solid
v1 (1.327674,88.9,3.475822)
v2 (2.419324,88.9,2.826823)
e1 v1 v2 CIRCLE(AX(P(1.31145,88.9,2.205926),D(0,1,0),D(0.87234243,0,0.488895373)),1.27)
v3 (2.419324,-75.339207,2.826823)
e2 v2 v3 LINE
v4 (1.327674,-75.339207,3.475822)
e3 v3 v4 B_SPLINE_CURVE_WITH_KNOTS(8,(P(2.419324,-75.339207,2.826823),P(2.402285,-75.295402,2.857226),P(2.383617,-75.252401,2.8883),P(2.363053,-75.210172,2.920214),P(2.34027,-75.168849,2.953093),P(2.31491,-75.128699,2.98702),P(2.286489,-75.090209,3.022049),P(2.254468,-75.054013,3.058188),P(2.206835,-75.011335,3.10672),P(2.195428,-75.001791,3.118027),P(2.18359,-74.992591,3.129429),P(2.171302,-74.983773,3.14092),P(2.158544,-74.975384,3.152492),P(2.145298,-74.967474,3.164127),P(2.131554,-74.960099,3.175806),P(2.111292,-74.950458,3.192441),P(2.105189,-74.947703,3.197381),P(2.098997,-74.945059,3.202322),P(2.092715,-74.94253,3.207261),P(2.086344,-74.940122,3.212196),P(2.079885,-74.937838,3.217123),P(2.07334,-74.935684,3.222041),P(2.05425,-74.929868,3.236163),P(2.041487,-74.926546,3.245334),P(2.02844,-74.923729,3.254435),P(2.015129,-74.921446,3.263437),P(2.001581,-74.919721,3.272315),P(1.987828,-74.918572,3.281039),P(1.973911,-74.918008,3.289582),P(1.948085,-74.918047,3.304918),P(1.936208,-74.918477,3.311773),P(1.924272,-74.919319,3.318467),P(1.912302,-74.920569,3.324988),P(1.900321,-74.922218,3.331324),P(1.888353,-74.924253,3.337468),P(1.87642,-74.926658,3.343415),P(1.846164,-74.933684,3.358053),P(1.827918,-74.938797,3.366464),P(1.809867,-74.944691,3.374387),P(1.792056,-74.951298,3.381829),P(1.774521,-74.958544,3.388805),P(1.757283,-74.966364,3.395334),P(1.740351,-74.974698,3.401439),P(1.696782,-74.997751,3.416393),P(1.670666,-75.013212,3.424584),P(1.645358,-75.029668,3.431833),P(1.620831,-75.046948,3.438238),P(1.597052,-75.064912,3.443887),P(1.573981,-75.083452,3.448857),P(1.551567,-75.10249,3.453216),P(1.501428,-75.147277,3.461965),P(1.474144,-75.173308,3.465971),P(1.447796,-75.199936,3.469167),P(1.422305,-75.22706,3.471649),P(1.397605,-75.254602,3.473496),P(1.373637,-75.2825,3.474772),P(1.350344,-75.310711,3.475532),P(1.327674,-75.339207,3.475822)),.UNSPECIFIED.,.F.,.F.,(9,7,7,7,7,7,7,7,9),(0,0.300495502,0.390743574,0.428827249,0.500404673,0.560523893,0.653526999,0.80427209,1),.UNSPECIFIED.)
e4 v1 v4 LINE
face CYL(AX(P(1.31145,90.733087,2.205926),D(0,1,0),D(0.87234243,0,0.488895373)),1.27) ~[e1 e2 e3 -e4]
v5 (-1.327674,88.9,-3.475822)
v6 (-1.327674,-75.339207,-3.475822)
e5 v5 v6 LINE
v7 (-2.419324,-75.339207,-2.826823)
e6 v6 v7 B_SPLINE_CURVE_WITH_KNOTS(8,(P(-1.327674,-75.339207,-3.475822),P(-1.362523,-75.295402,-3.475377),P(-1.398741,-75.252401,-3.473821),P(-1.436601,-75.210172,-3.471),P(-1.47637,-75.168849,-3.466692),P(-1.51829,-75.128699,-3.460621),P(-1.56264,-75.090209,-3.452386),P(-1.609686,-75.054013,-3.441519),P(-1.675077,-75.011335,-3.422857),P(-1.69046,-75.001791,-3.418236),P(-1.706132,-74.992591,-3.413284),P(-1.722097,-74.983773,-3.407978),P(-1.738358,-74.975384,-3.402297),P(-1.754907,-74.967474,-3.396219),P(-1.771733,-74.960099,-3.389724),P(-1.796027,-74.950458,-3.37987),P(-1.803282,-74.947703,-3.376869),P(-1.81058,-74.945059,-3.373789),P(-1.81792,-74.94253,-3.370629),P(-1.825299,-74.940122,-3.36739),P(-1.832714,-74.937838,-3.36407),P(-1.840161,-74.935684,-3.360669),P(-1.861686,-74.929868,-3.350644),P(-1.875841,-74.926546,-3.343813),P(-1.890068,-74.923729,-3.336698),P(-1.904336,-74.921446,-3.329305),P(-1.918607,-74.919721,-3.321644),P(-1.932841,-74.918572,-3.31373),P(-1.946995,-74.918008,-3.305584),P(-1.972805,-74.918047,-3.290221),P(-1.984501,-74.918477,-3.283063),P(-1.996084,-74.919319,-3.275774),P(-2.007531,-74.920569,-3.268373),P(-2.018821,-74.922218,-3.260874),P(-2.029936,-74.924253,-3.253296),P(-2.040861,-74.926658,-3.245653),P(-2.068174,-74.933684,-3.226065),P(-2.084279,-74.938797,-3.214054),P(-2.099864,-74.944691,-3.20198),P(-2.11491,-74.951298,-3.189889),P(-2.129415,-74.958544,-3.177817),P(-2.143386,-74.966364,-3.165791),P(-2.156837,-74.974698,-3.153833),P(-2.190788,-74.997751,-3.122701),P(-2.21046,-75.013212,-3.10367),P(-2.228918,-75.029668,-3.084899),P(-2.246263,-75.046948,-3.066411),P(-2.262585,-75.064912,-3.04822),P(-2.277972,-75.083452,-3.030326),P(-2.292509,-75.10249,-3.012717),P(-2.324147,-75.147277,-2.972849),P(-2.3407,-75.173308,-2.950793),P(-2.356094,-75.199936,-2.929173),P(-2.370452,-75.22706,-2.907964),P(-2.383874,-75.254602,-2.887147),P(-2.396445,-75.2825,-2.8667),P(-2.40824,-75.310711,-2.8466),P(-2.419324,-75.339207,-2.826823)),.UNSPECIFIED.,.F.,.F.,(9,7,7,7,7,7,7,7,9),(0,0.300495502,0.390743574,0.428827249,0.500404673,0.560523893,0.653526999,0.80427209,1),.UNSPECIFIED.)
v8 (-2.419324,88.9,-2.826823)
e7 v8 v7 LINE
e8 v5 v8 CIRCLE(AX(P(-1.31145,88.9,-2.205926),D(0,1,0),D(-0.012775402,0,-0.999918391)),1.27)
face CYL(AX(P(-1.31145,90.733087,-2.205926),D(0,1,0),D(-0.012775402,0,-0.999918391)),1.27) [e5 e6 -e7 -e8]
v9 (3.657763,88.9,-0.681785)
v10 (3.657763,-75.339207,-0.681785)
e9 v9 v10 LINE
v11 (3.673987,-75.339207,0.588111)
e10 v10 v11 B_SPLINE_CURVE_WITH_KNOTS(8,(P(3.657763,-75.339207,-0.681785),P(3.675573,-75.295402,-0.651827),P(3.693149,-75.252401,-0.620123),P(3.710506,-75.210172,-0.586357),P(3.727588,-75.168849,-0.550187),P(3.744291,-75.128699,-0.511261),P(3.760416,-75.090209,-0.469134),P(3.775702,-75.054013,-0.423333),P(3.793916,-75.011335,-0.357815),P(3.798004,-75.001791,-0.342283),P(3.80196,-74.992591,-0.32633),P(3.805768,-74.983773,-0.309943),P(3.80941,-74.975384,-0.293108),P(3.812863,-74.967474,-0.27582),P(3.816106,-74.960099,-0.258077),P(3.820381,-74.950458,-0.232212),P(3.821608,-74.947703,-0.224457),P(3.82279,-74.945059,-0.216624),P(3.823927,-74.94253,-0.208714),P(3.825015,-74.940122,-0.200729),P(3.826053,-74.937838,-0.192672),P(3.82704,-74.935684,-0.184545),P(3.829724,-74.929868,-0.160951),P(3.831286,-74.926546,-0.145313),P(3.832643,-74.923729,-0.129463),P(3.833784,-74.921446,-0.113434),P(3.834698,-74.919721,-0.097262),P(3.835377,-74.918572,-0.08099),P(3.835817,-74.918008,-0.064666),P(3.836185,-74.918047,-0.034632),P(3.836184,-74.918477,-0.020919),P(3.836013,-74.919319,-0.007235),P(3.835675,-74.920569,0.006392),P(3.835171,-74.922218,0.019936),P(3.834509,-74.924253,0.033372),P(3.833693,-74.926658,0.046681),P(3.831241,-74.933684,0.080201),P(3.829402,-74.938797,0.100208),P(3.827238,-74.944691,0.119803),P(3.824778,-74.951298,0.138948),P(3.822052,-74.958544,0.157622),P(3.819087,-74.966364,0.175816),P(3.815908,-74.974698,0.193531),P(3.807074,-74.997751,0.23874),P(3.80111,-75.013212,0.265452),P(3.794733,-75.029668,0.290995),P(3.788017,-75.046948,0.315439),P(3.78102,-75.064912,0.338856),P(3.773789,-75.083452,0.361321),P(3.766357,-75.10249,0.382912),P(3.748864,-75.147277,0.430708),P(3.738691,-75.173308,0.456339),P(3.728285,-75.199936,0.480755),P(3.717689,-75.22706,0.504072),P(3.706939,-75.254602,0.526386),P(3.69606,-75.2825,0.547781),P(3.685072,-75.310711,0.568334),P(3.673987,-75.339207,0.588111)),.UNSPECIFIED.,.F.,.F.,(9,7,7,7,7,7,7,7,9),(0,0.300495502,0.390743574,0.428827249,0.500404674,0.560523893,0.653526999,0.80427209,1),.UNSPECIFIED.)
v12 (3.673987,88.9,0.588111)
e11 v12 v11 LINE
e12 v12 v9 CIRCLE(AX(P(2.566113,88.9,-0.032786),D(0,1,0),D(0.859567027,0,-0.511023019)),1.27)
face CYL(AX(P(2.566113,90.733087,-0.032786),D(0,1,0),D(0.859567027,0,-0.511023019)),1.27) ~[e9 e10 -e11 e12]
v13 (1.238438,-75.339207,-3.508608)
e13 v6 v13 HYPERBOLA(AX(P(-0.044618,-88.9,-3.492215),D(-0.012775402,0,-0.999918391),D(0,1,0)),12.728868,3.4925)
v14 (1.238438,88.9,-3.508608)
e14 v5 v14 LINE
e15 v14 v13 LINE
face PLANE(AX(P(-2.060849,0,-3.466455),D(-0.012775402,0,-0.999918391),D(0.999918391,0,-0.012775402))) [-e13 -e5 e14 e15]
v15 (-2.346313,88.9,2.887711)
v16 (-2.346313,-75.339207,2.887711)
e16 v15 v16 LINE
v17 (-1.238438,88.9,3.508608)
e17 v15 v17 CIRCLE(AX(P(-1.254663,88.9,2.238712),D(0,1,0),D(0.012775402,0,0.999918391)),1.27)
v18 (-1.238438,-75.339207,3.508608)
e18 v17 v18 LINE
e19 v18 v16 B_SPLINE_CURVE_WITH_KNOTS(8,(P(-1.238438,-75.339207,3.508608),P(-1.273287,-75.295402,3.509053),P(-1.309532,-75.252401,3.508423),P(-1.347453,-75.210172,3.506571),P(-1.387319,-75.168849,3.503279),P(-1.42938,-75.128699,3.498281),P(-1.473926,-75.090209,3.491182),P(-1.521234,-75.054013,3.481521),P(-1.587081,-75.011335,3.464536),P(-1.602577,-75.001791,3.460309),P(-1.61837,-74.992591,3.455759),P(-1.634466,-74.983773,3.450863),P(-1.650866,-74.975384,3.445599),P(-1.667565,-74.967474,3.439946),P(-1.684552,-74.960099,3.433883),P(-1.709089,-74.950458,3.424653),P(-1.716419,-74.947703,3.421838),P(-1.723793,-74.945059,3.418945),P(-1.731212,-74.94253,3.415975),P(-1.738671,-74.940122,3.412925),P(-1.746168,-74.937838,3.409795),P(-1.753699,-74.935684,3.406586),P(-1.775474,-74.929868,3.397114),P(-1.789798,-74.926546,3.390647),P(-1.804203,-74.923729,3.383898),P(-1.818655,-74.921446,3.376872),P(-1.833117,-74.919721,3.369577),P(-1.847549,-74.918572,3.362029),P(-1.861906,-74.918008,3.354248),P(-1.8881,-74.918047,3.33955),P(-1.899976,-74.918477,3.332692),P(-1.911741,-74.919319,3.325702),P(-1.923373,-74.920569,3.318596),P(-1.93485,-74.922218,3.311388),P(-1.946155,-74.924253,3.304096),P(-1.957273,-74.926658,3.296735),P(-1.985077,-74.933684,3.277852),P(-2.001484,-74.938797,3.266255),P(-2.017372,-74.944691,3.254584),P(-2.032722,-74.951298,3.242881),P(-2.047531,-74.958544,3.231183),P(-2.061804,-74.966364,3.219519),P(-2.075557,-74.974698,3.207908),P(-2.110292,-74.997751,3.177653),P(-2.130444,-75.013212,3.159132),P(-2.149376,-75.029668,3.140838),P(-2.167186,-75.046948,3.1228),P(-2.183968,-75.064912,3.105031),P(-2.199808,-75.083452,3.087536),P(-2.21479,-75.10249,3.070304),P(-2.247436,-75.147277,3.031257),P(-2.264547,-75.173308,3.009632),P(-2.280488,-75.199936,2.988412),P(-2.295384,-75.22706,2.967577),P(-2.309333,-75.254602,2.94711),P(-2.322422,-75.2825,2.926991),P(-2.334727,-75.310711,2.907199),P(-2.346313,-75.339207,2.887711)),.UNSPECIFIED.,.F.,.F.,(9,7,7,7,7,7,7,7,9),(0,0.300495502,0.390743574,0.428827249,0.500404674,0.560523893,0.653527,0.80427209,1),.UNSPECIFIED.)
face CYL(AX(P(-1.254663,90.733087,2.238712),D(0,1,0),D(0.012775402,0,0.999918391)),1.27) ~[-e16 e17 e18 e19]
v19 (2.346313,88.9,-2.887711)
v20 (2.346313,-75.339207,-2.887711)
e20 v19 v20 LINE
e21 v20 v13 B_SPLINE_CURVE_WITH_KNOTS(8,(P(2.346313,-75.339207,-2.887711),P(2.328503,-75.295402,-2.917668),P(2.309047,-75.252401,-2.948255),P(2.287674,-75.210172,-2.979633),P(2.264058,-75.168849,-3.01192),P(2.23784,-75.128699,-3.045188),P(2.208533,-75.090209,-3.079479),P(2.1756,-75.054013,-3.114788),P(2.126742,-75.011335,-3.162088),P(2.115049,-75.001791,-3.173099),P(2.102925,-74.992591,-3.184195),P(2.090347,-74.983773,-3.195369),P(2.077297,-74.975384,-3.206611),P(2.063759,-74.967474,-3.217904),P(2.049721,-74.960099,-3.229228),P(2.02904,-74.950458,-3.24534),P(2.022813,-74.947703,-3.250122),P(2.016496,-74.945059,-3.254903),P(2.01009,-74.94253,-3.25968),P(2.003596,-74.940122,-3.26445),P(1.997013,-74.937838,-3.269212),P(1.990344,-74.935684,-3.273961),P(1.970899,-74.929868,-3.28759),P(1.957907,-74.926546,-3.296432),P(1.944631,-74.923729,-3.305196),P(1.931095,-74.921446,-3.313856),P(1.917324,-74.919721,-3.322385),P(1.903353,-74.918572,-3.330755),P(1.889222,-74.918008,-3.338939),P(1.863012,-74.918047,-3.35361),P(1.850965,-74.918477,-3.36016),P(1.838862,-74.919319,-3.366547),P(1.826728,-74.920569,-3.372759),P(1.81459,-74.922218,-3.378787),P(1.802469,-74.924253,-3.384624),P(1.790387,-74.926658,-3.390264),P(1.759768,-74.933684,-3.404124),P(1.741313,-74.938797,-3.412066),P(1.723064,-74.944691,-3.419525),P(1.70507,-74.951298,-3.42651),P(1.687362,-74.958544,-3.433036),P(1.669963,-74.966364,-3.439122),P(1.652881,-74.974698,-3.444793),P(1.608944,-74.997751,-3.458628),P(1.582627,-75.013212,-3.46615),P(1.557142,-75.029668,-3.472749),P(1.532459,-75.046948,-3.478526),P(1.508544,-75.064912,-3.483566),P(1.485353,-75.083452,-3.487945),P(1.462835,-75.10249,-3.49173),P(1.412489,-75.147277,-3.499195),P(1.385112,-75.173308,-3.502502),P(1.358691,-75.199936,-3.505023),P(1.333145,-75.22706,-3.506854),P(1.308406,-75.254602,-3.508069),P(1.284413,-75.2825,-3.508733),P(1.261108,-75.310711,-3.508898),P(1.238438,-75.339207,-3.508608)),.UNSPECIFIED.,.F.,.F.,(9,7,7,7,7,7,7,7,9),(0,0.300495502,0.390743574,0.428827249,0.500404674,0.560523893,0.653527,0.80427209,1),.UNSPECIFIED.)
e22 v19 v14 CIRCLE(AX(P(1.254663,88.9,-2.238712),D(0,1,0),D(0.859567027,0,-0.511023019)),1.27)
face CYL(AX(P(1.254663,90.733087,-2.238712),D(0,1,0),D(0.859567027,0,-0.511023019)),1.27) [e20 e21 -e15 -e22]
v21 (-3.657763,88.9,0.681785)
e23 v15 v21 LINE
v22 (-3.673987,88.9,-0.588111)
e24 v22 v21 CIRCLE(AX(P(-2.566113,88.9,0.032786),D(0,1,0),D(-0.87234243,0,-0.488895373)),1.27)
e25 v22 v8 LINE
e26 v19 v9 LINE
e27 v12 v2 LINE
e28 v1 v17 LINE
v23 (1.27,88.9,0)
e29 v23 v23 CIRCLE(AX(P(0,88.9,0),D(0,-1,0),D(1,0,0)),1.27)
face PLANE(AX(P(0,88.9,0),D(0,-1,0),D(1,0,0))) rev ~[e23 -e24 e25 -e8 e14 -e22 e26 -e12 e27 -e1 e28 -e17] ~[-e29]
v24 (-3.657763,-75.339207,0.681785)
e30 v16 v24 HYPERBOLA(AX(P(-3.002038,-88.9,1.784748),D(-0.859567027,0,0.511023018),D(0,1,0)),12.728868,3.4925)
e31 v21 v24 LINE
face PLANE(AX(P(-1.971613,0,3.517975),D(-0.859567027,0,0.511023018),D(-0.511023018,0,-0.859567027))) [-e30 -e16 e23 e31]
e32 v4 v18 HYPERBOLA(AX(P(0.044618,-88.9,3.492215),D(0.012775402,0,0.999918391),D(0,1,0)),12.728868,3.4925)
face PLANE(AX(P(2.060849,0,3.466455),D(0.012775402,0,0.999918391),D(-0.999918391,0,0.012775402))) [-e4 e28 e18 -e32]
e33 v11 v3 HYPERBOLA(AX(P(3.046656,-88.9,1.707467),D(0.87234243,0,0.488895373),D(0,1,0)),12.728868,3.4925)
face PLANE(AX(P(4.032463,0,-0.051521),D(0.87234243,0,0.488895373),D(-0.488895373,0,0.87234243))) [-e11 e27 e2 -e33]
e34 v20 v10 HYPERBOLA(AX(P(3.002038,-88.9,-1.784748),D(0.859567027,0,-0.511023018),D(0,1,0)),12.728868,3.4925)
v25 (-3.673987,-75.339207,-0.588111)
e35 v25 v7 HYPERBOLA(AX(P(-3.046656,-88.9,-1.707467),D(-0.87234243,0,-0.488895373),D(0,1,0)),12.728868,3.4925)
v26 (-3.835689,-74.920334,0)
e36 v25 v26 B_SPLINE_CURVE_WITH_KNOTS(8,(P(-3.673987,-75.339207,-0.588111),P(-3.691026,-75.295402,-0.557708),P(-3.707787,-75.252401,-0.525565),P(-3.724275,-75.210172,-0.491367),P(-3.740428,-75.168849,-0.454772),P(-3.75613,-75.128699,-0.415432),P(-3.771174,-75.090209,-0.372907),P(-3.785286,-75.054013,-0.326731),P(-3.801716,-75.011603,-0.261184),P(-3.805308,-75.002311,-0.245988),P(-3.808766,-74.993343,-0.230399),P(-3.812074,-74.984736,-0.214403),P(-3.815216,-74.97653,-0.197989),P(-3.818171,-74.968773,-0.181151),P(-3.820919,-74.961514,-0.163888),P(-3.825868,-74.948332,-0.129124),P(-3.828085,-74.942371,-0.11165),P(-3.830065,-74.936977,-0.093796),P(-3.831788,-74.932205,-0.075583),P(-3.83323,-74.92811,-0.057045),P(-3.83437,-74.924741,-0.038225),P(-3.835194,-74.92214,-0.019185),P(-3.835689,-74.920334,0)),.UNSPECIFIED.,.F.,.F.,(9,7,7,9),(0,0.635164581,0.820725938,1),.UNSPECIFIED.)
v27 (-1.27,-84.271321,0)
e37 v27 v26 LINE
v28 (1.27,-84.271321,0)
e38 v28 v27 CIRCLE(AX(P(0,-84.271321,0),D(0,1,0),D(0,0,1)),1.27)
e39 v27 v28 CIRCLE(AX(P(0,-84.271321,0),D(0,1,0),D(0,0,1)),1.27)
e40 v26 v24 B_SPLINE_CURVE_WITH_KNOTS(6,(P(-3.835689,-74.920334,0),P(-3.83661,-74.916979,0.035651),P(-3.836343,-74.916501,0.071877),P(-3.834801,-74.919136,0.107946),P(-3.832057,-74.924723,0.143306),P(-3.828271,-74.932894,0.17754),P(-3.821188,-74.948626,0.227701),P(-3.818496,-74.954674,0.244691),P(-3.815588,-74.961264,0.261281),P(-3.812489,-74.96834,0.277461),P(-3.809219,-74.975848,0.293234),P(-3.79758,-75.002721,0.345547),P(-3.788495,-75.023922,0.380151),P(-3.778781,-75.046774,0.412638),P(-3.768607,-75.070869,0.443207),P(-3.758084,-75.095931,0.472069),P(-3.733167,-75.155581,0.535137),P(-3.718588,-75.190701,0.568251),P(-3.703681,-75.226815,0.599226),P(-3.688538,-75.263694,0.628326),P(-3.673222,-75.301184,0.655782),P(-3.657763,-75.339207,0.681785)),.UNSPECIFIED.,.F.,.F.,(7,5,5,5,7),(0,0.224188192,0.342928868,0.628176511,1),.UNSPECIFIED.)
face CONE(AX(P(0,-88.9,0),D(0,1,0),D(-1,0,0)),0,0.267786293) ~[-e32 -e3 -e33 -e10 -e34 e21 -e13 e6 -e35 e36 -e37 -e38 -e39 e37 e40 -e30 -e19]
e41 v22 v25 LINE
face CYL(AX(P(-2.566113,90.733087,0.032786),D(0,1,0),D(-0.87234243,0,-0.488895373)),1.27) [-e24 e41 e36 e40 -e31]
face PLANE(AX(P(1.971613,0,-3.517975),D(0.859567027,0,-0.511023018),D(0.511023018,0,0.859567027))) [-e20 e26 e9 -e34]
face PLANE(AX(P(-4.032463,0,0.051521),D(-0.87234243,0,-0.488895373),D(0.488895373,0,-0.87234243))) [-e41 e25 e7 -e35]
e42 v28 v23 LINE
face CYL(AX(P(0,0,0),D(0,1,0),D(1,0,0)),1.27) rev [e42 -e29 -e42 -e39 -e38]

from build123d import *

# Parameters (mm, degrees)
F0_R        = 1.27
F1_DEPTH    = 88.9
F5_T1_DEPTH = 181.4661742094


# Not quite as in the source:
# - a fillet or chamfer that OpenCascade refuses, or shapes differently, is made with other operations: its cross-section is extruded or revolved along the edge and cut away or added


with BuildPart() as f1:
    # F0 (on Front) → F1 (new body, symmetric)
    with BuildSketch(Plane.XZ):
        Polygon((4.0324625191, -0.0515205351), (2.0608493518, 3.4664547138), (-1.9716131673, 3.5179752489), (-4.0324625191, 0.0515205351), (-2.0608493518, -3.4664547138), (1.9716131673, -3.5179752489), align=None)
        Circle(F0_R, mode=Mode.SUBTRACT)
    extrude(amount=F1_DEPTH, both=True)

    # F2 (on Top) → F4 (revolve, cut)
    with BuildSketch(Plane.XY):
        Polygon((0, -99.6820554137), (0, -88.9), (-4.0324625191, -74.2031688439), (-4.0324625191, -99.6820554137), align=None)
    revolve(axis=Axis((0, -76.0434828699, 0), (0, -1, 0)), mode=Mode.SUBTRACT)

    # F5: fillet of radius 1.27 on 6 edges, made by hand

    # F5_s2 → F5_t1 (cut)
    with BuildSketch(Plane.XZ.offset(-90.7330871047)):
        with BuildLine():
            ThreePointArc((2.4193244731, 2.8268228503), (1.960448821, 3.2975758517), (1.3276743483, 3.4758220838))
            Line((1.3276743483, 3.4758220838), (2.0608493518, 3.4664547138))
            Line((2.0608493518, 3.4664547138), (2.4193244731, 2.8268228503))
        make_face()
        with BuildLine():
            ThreePointArc((-1.2384381638, 3.5086078789), (-1.875560048, 3.3465864076), (-2.3463130494, 2.8877107555))
            Line((-2.3463130494, 2.8877107555), (-1.9716131673, 3.5179752489))
            Line((-1.9716131673, 3.5179752489), (-1.2384381638, 3.5086078789))
        make_face()
        with BuildLine():
            ThreePointArc((-3.6739873978, -0.5881113283), (-3.836008869, 0.0490105559), (-3.6577626369, 0.6817850286))
            Line((-3.6577626369, 0.6817850286), (-4.0324625191, 0.0515205351))
            Line((-4.0324625191, 0.0515205351), (-3.6739873978, -0.5881113283))
        make_face()
        with BuildLine():
            ThreePointArc((-1.3276743483, -3.4758220838), (-1.960448821, -3.2975758517), (-2.4193244731, -2.8268228503))
            Line((-2.4193244731, -2.8268228503), (-2.0608493518, -3.4664547138))
            Line((-2.0608493518, -3.4664547138), (-1.3276743483, -3.4758220838))
        make_face()
        with BuildLine():
            ThreePointArc((2.3463130494, -2.8877107555), (1.875560048, -3.3465864076), (1.2384381638, -3.5086078789))
            Line((1.2384381638, -3.5086078789), (1.9716131673, -3.5179752489))
            Line((1.9716131673, -3.5179752489), (2.3463130494, -2.8877107555))
        make_face()
        with BuildLine():
            ThreePointArc((3.6577626369, -0.6817850286), (3.836008869, -0.0490105559), (3.6739873978, 0.5881113283))
            Line((3.6739873978, 0.5881113283), (4.0324625191, -0.0515205351))
            Line((4.0324625191, -0.0515205351), (3.6577626369, -0.6817850286))
        make_face()
    extrude(amount=F5_T1_DEPTH, mode=Mode.SUBTRACT)


solid = f1.part
